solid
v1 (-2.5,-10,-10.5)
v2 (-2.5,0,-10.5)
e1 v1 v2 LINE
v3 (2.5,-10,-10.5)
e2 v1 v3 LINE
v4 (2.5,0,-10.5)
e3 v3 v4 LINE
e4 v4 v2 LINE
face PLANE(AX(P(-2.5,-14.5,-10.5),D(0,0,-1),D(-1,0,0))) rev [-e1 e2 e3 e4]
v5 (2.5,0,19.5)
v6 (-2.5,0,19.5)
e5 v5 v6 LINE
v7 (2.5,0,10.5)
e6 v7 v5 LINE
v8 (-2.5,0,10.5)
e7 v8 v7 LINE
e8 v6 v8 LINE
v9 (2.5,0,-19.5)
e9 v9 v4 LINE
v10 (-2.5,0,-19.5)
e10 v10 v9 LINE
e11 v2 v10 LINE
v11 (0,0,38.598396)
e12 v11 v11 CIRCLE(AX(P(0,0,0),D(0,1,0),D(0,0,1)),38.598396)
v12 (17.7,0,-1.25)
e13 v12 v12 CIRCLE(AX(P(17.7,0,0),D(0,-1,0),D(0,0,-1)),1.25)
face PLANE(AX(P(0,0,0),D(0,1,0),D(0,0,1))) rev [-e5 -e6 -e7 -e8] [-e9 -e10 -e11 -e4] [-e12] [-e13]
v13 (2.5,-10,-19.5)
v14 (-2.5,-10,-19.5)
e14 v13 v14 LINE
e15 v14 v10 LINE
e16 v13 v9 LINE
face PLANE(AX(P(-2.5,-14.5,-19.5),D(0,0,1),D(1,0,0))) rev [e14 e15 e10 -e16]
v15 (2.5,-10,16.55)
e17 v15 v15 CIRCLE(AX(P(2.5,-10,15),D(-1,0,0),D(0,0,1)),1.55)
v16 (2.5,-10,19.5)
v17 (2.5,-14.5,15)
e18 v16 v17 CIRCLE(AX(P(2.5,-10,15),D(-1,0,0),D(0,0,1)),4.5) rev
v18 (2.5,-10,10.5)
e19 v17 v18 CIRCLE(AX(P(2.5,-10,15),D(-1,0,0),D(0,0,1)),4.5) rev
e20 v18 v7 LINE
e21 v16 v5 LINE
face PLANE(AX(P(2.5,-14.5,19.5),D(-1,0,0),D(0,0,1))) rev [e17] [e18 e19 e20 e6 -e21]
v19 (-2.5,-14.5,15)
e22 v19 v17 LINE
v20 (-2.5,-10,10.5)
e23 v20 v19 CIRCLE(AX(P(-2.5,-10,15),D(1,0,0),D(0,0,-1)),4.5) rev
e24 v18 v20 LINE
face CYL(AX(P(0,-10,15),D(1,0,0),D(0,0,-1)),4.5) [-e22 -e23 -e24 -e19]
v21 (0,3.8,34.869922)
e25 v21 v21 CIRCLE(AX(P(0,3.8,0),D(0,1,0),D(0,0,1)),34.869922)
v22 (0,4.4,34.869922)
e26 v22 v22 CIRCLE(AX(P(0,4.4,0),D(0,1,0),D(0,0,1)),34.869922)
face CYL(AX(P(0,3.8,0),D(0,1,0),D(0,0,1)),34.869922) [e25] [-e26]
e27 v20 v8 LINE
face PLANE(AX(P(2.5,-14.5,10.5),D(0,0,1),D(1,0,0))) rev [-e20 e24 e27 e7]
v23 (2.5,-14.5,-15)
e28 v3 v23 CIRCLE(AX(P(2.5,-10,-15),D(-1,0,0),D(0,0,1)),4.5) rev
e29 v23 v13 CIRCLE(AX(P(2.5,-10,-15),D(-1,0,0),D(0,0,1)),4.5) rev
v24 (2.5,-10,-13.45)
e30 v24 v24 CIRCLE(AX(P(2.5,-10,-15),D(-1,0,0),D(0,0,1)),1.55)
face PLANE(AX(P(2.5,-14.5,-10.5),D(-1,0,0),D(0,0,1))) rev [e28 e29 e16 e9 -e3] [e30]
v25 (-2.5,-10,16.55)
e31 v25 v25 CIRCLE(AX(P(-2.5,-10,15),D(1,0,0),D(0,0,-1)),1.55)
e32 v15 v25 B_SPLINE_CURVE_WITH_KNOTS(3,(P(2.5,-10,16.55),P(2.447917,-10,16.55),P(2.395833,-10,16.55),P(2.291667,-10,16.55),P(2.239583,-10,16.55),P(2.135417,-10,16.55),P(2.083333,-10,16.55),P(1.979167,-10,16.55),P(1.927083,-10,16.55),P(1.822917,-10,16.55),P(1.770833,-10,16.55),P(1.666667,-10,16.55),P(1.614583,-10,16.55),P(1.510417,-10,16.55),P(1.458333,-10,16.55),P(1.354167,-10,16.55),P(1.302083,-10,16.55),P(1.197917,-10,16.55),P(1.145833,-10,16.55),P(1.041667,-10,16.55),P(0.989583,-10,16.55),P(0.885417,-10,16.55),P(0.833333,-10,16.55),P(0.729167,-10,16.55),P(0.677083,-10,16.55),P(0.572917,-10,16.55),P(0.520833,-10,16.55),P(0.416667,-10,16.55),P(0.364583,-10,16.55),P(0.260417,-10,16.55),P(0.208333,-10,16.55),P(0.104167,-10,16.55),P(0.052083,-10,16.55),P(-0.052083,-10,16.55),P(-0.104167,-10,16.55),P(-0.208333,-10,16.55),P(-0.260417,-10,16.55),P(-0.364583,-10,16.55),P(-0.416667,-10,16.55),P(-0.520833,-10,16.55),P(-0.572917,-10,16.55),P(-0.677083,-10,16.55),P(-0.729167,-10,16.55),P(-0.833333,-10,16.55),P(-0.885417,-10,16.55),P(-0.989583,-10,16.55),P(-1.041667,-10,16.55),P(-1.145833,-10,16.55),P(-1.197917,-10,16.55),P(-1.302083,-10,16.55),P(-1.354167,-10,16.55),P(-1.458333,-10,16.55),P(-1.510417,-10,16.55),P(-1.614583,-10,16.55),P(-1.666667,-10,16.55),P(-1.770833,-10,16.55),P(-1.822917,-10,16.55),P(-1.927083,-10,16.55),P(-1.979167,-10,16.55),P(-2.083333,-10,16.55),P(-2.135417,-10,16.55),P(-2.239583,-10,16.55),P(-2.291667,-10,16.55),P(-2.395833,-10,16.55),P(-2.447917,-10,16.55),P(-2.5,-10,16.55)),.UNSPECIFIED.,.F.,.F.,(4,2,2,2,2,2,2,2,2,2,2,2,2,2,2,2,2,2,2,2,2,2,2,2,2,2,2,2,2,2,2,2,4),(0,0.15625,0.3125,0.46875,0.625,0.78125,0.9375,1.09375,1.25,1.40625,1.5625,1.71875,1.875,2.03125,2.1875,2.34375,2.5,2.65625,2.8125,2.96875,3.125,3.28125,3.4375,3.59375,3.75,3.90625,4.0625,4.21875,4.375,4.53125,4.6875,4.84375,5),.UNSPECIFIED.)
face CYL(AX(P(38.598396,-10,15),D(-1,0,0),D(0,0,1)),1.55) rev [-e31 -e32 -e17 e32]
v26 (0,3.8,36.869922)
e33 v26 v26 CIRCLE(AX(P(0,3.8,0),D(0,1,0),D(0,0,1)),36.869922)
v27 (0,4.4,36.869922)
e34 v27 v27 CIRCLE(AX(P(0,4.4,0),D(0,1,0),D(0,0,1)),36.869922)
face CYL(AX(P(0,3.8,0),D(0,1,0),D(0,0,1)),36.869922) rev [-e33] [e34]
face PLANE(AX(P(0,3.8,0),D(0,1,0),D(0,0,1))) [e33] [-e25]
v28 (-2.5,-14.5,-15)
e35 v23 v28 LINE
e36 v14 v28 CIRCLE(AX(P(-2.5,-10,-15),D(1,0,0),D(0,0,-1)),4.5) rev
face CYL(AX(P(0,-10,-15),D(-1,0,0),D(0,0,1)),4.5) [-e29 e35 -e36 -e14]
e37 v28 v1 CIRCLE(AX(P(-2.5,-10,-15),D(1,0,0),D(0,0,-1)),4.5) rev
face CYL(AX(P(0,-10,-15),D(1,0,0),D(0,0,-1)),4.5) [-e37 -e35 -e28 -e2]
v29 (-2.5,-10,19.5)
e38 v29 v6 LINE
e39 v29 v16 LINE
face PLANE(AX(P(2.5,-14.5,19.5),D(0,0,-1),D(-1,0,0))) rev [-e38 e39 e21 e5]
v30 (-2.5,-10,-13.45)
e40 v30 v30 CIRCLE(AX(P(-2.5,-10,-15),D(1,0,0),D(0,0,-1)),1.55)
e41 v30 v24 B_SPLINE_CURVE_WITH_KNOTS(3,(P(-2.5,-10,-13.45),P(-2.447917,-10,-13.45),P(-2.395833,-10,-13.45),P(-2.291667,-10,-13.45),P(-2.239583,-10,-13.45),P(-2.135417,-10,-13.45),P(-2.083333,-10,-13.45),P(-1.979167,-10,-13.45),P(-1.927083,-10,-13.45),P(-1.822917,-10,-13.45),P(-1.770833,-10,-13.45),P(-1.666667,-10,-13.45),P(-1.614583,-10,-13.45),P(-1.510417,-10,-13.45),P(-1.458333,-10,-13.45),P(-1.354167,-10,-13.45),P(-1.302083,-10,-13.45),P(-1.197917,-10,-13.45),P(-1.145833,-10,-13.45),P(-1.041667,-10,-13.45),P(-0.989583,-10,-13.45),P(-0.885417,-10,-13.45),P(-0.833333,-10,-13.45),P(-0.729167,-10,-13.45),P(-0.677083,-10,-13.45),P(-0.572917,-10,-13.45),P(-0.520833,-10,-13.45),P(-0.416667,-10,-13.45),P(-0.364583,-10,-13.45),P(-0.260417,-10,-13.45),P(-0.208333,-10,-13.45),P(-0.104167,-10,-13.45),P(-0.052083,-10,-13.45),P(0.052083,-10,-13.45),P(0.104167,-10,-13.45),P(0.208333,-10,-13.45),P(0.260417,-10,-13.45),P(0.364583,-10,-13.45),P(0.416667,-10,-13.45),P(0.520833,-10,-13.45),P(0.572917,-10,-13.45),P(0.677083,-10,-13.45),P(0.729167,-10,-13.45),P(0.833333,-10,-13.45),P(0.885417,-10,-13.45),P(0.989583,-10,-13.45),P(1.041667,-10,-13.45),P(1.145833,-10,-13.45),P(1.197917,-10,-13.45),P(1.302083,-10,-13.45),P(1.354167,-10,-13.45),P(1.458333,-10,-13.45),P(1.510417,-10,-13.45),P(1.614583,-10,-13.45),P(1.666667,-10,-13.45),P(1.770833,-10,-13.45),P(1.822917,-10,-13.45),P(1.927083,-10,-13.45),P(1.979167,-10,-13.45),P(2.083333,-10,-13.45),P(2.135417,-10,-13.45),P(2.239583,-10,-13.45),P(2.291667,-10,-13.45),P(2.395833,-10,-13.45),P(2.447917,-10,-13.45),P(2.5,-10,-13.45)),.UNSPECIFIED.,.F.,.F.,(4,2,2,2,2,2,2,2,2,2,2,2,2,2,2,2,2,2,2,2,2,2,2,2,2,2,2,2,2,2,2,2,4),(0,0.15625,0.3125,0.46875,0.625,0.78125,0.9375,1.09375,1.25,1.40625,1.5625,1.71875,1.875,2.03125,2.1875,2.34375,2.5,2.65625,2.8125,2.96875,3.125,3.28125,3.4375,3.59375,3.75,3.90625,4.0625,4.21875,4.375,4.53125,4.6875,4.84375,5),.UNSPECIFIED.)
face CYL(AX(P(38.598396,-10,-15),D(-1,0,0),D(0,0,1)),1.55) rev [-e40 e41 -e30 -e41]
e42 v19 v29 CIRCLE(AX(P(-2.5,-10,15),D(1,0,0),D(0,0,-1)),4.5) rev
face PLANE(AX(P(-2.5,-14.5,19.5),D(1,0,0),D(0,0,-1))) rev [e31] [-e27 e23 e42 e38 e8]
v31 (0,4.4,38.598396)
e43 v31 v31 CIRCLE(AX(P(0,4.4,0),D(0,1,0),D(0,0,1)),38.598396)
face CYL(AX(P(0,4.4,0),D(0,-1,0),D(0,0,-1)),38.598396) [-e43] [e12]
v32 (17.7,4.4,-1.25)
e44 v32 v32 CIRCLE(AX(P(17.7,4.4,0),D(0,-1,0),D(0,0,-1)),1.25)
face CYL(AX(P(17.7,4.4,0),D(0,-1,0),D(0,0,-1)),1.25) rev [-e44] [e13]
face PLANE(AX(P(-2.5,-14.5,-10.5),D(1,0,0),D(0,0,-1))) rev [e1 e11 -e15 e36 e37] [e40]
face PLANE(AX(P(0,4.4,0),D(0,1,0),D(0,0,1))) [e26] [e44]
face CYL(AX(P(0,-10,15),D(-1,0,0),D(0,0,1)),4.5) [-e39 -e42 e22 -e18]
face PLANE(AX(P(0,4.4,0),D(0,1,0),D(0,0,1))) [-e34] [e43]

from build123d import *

# Parameters (mm, degrees)
SKETCH_1_R               = 38.598396019
EXTRUDE_1_DEPTH          = 4.4
SKETCH_2_R               = 36.869922329
SKETCH_2_R_2             = 34.869922329
CUT_EXTRUDE_1_DEPTH      = 0.6
SKETCH_3_W               = 5
SKETCH_3_H               = 9
EXTRUDE_2_DEPTH          = 14.5
FILLET_2_R               = 4.5
CUT_EXTRUDE_2_DEPTH      = 59.216529702
CUT_EXTRUDE_2_DEPTH_BACK = 59.216529702
SKETCH_4_R               = 1.55
CUT_EXTRUDE_3_DEPTH      = 57.479397575
CUT_EXTRUDE_3_DEPTH_BACK = 57.479397575
SKETCH_5_R               = 1.25


with BuildPart() as part:
    # 스케치1 → 보스-돌출1 (new body)
    with BuildSketch(Plane(origin=(0, 0, 0), x_dir=(1, 0, 0), z_dir=(0, 1, 0))):
        with Locations(Location((0, 0, 0), (0, 0, 270))):
            Circle(SKETCH_1_R)
    extrude(amount=EXTRUDE_1_DEPTH)

    # 스케치2 → 컷-돌출1 (cut)
    with BuildSketch(Plane(origin=(0, 4.4, 0), x_dir=(1, 0, 0), z_dir=(0, 1, 0))):
        with Locations(Location((0, 0, 0), (0, 0, 270))):
            Circle(SKETCH_2_R)
        with Locations(Location((0, 0, 0), (0, 0, 270))):
            Circle(SKETCH_2_R_2, mode=Mode.SUBTRACT)
    extrude(amount=-CUT_EXTRUDE_1_DEPTH, mode=Mode.SUBTRACT)

    # 스케치3 → 보스-돌출2 (add)
    with BuildSketch(Plane.XZ):
        with Locations((0, -15)):
            Rectangle(SKETCH_3_W, SKETCH_3_H)
        with Locations((0, 15)):
            Rectangle(SKETCH_3_W, SKETCH_3_H)
    extrude(amount=EXTRUDE_2_DEPTH)

    # 필렛2
    fillet_2_edges = [part.edges().sort_by_distance(p)[0] for p in [
        (0, -14.5, -19.5),
        (0, -14.5, -10.5),
        (0, -14.5, 19.5),
        (0, -14.5, 10.5),
    ]]
    fillet(fillet_2_edges, radius=FILLET_2_R - 0.0001)  # a hair under: the kernel refuses the full size

    # 스케치4 → 컷-돌출2 (cut, two sides: drawn at the far end of the back side and taken through both)
    with BuildSketch(Plane.ZY.offset(2.5).offset(-CUT_EXTRUDE_2_DEPTH_BACK)):
        with Locations((-15, -10)):
            Circle(SKETCH_4_R)
        with Locations((15, -10)):
            Circle(SKETCH_4_R)
    extrude(amount=CUT_EXTRUDE_2_DEPTH + CUT_EXTRUDE_2_DEPTH_BACK, mode=Mode.SUBTRACT)

    # 스케치5 → 컷-돌출3 (cut, two sides: drawn at the far end of the back side and taken through both)
    with BuildSketch(Plane.XZ.offset(-CUT_EXTRUDE_3_DEPTH_BACK)):
        with Locations(Location((17.7, 0, 0), (0, 0, 270))):
            Circle(SKETCH_5_R)
    extrude(amount=CUT_EXTRUDE_3_DEPTH + CUT_EXTRUDE_3_DEPTH_BACK, mode=Mode.SUBTRACT)


solid = part.part
